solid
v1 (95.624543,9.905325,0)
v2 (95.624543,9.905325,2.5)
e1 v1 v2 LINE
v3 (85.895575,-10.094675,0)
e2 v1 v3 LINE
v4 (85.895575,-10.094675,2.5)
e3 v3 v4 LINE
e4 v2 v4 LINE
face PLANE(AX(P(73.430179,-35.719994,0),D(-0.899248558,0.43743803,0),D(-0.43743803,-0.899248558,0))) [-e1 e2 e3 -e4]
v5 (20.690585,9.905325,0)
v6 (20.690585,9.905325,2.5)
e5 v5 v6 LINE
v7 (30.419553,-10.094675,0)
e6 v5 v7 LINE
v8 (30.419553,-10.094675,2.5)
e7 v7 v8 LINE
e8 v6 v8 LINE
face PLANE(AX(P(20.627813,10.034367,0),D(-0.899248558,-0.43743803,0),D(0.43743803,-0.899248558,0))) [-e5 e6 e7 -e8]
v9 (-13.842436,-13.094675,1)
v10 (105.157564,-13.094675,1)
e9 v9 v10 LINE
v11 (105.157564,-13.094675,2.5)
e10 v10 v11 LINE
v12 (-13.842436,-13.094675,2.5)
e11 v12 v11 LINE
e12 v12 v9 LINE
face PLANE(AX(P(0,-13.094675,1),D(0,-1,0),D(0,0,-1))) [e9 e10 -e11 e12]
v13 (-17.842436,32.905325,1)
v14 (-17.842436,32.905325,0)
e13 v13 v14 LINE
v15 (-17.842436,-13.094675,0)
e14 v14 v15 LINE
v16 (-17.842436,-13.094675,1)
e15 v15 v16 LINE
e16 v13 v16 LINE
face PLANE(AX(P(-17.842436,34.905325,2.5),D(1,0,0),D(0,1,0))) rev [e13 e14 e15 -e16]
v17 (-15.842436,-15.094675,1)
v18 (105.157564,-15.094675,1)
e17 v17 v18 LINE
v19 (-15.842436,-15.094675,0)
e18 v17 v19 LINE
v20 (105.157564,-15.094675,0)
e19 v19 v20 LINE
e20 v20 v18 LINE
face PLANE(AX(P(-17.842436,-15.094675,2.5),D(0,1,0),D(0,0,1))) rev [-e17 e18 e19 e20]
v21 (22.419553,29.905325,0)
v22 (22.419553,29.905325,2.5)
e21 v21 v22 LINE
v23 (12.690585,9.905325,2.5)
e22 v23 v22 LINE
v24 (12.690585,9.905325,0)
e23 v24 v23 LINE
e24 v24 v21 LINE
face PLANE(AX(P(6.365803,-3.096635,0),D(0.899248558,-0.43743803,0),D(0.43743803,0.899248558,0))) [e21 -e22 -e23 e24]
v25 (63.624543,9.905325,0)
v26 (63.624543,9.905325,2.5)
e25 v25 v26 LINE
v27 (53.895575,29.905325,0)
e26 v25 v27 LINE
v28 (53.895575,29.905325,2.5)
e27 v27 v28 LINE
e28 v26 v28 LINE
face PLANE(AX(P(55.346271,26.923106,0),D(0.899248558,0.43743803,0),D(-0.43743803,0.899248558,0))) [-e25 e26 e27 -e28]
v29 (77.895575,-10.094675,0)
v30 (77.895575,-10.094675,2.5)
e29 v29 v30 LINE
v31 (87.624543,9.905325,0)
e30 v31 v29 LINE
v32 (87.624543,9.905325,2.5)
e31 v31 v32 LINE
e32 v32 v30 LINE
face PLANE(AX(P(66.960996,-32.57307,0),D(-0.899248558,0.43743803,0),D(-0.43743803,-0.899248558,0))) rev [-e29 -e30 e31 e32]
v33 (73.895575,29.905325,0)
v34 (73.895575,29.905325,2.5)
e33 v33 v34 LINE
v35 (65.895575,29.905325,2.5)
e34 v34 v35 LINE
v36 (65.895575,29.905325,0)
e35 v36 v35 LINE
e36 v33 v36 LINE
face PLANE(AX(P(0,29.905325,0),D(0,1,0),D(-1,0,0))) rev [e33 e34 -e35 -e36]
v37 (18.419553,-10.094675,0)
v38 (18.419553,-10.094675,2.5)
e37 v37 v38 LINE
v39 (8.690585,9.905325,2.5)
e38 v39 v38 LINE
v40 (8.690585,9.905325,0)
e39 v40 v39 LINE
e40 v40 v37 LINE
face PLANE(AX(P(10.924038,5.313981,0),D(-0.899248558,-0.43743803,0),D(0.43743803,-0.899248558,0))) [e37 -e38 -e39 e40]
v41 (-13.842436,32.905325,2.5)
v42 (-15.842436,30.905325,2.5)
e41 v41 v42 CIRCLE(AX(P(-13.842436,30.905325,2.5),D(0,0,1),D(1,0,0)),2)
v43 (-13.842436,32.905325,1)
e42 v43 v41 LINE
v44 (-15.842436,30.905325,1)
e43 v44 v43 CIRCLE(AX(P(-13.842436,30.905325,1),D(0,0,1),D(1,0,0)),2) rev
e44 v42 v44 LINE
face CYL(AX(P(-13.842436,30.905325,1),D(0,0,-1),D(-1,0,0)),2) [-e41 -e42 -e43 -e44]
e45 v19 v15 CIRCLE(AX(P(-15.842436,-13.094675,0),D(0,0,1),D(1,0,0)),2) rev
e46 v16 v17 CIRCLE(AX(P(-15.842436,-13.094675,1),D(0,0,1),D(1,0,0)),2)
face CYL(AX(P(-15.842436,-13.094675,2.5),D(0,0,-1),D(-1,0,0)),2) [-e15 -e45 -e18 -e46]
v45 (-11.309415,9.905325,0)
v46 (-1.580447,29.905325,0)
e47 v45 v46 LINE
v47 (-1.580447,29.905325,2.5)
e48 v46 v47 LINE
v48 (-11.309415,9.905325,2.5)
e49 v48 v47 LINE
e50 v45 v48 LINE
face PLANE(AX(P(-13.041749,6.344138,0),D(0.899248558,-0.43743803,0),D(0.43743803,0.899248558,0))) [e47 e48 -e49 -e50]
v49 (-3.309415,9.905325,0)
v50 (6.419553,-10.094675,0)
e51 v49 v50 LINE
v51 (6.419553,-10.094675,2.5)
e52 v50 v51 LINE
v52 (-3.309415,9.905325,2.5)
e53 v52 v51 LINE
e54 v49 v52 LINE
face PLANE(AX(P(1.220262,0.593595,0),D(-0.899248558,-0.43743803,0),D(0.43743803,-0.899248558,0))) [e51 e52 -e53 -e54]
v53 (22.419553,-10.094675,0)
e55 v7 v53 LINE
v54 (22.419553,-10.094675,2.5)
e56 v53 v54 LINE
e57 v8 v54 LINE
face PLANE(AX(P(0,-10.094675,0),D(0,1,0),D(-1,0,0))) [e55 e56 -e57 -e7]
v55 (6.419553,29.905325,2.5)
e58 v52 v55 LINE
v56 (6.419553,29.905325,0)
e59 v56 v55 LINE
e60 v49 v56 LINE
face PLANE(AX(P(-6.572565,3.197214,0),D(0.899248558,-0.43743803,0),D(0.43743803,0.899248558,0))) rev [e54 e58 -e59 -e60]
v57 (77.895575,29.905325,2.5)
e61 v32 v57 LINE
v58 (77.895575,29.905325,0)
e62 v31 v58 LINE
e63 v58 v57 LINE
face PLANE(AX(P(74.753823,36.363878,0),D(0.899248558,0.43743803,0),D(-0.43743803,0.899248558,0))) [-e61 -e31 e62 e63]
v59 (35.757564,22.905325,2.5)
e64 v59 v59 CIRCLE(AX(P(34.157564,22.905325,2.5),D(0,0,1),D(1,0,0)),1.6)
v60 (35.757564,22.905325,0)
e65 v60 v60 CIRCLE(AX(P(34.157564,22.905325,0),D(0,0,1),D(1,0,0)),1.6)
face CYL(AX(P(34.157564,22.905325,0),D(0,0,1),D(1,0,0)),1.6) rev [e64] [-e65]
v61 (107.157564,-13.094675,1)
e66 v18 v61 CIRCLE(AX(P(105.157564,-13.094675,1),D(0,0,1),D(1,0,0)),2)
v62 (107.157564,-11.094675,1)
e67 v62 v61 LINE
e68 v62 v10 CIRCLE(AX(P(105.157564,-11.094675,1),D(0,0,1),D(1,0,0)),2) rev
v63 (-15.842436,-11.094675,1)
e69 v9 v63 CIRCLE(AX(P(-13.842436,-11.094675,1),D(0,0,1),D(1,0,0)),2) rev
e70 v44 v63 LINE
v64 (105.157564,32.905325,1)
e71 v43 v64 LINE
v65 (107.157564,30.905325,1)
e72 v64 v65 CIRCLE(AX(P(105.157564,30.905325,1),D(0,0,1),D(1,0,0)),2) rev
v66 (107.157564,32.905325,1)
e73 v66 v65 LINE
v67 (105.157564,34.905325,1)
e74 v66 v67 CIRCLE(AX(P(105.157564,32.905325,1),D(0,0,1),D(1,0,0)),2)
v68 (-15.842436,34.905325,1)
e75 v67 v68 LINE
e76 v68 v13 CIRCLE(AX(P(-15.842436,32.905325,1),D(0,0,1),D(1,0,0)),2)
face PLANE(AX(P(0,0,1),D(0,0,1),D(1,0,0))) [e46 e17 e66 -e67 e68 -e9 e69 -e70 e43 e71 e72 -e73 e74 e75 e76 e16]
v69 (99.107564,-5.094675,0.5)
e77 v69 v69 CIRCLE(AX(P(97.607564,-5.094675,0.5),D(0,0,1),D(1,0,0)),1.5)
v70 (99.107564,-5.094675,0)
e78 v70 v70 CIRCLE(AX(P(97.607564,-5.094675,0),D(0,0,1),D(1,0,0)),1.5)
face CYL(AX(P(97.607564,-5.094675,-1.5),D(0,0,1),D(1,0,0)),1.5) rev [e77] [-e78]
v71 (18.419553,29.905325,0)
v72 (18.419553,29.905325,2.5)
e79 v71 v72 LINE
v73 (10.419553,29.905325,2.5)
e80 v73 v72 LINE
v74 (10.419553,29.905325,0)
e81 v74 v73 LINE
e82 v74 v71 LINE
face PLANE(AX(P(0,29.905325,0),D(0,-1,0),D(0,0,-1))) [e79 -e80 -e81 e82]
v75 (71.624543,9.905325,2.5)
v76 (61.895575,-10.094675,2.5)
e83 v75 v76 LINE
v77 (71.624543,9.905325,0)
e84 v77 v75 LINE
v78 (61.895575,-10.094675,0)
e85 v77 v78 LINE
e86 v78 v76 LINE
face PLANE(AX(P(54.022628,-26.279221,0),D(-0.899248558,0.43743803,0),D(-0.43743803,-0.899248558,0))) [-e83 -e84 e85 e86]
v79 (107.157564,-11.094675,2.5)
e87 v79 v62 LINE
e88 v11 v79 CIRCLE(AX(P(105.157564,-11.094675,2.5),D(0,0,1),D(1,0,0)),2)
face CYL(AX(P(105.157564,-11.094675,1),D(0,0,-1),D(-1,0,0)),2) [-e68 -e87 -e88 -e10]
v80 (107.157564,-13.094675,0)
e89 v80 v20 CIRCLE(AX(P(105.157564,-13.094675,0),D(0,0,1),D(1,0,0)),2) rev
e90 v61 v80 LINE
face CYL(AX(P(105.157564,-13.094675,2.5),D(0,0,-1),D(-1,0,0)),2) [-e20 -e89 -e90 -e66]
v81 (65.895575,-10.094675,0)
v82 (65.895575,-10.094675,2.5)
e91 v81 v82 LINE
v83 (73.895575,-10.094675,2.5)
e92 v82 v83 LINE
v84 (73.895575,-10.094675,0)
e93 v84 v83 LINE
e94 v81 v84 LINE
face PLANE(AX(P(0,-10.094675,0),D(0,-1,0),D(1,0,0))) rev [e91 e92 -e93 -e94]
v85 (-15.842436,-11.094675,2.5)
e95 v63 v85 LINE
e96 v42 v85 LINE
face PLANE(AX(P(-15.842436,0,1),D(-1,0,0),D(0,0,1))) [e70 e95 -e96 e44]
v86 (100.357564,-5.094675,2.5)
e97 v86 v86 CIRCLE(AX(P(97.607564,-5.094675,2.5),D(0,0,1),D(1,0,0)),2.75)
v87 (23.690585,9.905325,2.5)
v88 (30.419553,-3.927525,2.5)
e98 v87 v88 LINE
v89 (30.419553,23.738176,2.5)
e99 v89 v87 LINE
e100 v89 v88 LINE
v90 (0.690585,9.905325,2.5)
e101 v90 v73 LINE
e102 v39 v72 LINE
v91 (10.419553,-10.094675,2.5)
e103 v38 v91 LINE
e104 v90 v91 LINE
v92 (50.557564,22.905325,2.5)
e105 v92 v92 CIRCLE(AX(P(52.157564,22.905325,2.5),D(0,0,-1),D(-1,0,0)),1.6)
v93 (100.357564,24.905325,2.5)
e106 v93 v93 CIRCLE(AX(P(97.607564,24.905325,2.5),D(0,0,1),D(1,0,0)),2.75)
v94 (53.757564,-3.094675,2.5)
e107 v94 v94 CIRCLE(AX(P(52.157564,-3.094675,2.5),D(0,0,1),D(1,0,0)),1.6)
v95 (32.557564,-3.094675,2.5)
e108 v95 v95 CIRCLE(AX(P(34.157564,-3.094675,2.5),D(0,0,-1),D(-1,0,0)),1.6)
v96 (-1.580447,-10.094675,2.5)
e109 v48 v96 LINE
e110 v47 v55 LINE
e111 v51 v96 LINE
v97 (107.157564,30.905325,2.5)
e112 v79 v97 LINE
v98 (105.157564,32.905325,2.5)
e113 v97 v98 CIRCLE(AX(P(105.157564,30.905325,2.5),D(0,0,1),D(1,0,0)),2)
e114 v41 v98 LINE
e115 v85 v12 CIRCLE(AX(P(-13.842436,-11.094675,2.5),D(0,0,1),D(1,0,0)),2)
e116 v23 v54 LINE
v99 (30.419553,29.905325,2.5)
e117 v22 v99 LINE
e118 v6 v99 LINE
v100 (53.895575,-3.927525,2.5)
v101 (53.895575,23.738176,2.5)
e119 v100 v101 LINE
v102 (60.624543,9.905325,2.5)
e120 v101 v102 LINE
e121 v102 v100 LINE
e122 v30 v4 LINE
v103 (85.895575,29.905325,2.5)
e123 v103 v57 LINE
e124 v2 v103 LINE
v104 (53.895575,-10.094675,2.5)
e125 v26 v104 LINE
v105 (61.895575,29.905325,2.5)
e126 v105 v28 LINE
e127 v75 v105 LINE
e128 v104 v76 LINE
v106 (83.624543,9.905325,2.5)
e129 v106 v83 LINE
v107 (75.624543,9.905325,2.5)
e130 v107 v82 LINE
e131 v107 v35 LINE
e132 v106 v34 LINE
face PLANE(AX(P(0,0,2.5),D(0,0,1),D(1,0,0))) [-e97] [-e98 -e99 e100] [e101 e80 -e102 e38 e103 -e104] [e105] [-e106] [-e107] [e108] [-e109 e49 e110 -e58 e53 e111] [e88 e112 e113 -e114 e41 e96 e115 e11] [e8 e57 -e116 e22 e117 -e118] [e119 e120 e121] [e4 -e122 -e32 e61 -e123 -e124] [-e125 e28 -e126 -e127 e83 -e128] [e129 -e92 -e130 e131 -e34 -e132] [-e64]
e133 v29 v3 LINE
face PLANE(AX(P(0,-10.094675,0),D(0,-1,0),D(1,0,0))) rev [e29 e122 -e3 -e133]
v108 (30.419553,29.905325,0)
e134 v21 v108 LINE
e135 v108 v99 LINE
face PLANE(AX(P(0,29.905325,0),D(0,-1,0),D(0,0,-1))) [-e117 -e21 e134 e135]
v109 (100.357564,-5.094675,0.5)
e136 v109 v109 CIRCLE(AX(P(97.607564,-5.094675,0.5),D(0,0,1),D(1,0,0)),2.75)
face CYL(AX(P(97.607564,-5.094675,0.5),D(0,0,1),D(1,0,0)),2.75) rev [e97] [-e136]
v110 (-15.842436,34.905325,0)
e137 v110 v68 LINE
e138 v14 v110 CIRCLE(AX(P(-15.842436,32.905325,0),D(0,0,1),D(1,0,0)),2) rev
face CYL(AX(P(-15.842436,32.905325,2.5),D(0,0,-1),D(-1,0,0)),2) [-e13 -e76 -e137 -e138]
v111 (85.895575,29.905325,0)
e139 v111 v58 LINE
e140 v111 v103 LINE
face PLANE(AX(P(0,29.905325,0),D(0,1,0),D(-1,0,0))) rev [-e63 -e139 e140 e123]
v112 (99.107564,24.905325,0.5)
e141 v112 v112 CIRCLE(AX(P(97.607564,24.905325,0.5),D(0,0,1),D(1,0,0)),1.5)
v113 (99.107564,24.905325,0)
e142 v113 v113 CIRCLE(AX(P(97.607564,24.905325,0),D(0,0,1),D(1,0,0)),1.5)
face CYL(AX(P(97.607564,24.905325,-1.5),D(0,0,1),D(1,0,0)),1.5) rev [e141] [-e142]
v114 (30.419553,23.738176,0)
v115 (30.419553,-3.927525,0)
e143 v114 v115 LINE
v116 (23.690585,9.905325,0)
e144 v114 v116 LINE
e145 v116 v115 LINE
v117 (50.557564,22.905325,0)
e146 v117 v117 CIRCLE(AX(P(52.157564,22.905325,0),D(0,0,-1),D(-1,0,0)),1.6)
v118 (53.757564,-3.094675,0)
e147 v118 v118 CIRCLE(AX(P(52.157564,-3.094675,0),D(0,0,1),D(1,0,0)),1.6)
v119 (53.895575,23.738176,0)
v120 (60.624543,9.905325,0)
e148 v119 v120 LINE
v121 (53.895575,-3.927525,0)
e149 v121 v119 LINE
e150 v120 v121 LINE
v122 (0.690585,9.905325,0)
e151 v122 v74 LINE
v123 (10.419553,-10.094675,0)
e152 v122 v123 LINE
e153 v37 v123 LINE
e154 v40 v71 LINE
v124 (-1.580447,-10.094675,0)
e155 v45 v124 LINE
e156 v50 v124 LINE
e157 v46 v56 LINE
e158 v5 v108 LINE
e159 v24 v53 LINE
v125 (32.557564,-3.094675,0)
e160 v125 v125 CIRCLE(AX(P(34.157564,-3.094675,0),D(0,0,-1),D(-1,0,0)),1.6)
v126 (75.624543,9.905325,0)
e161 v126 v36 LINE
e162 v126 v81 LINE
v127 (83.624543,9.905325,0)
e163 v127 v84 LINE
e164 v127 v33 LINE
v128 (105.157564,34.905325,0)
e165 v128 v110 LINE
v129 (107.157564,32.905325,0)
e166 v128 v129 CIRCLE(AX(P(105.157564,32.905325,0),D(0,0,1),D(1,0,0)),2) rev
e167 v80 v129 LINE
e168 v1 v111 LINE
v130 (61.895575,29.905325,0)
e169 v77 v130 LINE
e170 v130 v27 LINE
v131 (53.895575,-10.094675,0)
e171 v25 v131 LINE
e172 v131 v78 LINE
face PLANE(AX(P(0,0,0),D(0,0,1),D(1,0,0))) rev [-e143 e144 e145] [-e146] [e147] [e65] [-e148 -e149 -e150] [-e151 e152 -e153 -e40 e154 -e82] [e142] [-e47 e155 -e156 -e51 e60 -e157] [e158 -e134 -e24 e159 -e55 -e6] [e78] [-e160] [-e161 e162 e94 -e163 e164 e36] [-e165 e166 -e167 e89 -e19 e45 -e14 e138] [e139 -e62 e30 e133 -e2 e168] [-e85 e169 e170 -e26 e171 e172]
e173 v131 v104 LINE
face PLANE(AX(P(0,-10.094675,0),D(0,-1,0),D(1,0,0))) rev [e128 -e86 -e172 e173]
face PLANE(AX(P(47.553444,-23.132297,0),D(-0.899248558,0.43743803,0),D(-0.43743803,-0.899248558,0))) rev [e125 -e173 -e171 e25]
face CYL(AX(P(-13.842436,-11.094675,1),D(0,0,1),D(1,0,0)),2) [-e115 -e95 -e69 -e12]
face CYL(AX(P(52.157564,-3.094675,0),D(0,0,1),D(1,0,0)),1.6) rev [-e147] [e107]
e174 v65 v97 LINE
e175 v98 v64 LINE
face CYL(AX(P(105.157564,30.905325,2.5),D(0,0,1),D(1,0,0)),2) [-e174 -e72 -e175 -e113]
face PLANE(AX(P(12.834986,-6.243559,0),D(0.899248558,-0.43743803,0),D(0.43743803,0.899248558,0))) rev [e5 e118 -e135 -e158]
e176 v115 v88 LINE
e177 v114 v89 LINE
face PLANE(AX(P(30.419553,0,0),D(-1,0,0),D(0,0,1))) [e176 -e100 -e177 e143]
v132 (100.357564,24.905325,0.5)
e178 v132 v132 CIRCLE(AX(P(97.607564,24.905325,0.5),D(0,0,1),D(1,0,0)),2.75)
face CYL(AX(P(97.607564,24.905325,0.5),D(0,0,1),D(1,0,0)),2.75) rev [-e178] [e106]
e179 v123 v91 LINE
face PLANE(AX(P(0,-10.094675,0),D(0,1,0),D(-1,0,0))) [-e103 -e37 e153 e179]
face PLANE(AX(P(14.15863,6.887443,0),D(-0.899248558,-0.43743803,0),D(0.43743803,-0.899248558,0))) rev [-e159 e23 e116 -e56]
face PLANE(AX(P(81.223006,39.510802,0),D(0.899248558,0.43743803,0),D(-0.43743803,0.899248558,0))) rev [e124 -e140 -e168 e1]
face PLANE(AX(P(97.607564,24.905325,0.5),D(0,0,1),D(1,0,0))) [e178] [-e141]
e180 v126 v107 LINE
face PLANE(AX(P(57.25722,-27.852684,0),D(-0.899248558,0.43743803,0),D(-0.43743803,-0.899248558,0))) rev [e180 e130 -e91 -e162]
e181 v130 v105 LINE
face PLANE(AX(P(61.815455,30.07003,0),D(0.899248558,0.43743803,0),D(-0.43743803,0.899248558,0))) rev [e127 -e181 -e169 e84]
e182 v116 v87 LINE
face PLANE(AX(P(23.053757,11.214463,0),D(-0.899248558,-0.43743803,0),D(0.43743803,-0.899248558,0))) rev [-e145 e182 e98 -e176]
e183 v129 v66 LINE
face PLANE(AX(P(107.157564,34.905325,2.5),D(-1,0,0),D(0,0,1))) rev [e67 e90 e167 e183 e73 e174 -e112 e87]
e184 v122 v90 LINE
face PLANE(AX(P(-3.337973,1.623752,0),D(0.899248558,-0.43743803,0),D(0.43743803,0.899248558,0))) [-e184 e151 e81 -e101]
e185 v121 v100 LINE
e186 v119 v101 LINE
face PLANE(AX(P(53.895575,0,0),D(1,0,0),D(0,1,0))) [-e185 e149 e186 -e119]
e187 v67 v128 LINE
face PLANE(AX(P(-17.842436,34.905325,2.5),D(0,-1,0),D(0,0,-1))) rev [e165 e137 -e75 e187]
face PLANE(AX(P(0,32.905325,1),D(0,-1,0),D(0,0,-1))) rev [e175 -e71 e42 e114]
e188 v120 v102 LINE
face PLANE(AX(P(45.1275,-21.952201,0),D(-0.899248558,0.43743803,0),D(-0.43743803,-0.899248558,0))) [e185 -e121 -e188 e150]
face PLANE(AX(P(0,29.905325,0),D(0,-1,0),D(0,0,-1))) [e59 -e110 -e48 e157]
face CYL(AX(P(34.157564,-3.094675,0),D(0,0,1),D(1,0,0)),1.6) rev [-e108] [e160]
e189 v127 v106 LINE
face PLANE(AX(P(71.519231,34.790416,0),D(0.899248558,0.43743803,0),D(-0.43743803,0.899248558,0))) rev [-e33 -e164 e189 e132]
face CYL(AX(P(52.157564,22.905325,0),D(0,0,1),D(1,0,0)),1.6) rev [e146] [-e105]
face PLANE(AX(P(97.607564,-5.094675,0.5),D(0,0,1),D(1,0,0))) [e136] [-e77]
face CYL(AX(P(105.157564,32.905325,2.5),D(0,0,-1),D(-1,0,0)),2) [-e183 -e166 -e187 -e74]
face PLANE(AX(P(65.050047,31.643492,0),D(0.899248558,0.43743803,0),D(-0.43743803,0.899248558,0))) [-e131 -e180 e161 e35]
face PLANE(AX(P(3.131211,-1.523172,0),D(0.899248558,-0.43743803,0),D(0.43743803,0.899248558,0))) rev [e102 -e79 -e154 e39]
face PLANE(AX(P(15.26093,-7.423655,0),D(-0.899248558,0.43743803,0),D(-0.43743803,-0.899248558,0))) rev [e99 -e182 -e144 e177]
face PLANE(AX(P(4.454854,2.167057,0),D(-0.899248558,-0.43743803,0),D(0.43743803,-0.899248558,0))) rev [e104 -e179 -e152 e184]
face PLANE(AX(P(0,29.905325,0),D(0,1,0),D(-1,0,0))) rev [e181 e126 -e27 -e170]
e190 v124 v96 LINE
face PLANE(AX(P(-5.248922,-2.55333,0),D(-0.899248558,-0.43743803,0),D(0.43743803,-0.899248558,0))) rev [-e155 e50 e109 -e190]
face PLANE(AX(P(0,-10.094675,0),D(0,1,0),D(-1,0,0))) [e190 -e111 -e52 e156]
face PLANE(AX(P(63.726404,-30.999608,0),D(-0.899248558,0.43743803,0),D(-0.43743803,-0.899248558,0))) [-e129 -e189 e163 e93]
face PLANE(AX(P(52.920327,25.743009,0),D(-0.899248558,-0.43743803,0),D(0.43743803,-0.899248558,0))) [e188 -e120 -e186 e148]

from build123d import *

# Parameters (mm, degrees)
ESBO_O1_W                  = 125
ESBO_O1_H                  = 50
RESSALTO_EXTRUS_O1_DEPTH   = 2.5
ESBO_O2_R                  = 1.6
CORTE_EXTRUS_O2_DEPTH      = 2.5
CORTE_EXTRUS_O3_DEPTH      = 1.5
CORTE_EXTRUS_O5_DEPTH      = 113.726994752
CORTE_EXTRUS_O5_DEPTH_BACK = 113.726994752
ESBO_O12_R                 = 2.75
CORTE_EXTRUS_O6_DEPTH      = 2
ESBO_O19_R                 = 1.5
CORTE_EXTRUS_O7_DEPTH      = 2
FILETE1_R                  = 2


with BuildPart() as part:
    # Esboço1 → Ressalto-extrusão1 (new body)
    with BuildSketch(Plane.XY):
        with Locations((44.657564369, 9.905325444)):
            Rectangle(ESBO_O1_W, ESBO_O1_H)
    extrude(amount=RESSALTO_EXTRUS_O1_DEPTH)

    # Esboço2 → Corte-extrusão2 (cut)
    with BuildSketch(Plane.XY.offset(2.5)):
        with Locations((34.157564369, 22.905325444)):
            Circle(ESBO_O2_R)
        with Locations(Location((34.157564369, -3.094674556, 0), (0, 0, 180))):
            Circle(ESBO_O2_R)
        with Locations((52.157564369, -3.094674556)):
            Circle(ESBO_O2_R)
        with Locations(Location((52.157564369, 22.905325444, 0), (0, 0, 180))):
            Circle(ESBO_O2_R)
    extrude(amount=-CORTE_EXTRUS_O2_DEPTH, mode=Mode.SUBTRACT)

    # Esboço3 → Corte-extrusão3 (cut)
    with BuildSketch(Plane.XY.offset(2.5)):
        Polygon((-17.842435631, 32.905325444), (-17.842435631, 9.905325444), (-15.842435631, 9.905325444), (-15.842435631, 32.905325444), (107.157564369, 32.905325444), (107.157564369, 34.905325444), (-15.842435631, 34.905325444), (-17.842435631, 34.905325444), align=None)
        Polygon((-15.842435631, 9.905325444), (-17.842435631, 9.905325444), (-17.842435631, -13.094674556), (-17.842435631, -15.094674556), (-15.842435631, -15.094674556), (107.157564369, -15.094674556), (107.157564369, -13.094674556), (-15.842435631, -13.094674556), align=None)
    extrude(amount=-CORTE_EXTRUS_O3_DEPTH, mode=Mode.SUBTRACT)

    # Esboço4 → Corte-extrusão5 (cut, two sides: drawn at the far end of the back side and taken through both)
    with BuildSketch(Plane.XY.offset(2.5).offset(-CORTE_EXTRUS_O5_DEPTH_BACK)):
        Polygon((0.690585312, 9.905325444), (10.419553485, -10.094674556), (18.419553485, -10.094674556), (8.690585312, 9.905325444), (18.419553485, 29.905325444), (10.419553485, 29.905325444), align=None)
        Polygon((20.690585312, 9.905325444), (30.419553485, 29.905325444), (22.419553485, 29.905325444), (12.690585312, 9.905325444), (22.419553485, -10.094674556), (30.419553485, -10.094674556), align=None)
        Polygon((30.419553485, 23.738176067), (23.690585312, 9.905325444), (30.419553485, -3.927525179), align=None)
        Polygon((-11.309414688, 9.905325444), (-1.580446515, -10.094674556), (6.419553485, -10.094674556), (-3.309414688, 9.905325444), (6.419553485, 29.905325444), (-1.580446515, 29.905325444), align=None)
        Polygon((95.624543426, 9.905325444), (85.895575254, 29.905325444), (77.895575254, 29.905325444), (87.624543426, 9.905325444), (77.895575254, -10.094674556), (85.895575254, -10.094674556), align=None)
        Polygon((83.624543426, 9.905325444), (73.895575254, 29.905325444), (65.895575254, 29.905325444), (75.624543426, 9.905325444), (65.895575254, -10.094674556), (73.895575254, -10.094674556), align=None)
        Polygon((71.624543426, 9.905325444), (61.895575254, 29.905325444), (53.895575254, 29.905325444), (63.624543426, 9.905325444), (53.895575254, -10.094674556), (61.895575254, -10.094674556), align=None)
        Polygon((60.624543426, 9.905325444), (53.895575254, -3.927525179), (53.895575254, 23.738176067), align=None)
    extrude(amount=CORTE_EXTRUS_O5_DEPTH + CORTE_EXTRUS_O5_DEPTH_BACK, mode=Mode.SUBTRACT)

    # Esboço12 → Corte-extrusão6 (cut)
    with BuildSketch(Plane.XY.offset(2.5)):
        with Locations((97.607564369, 24.905325444)):
            Circle(ESBO_O12_R)
        with Locations((97.607564369, -5.094674556)):
            Circle(ESBO_O12_R)
    extrude(amount=-CORTE_EXTRUS_O6_DEPTH, mode=Mode.SUBTRACT)

    # Esboço19 → Corte-extrusão7 (cut)
    with BuildSketch(Plane.XY.offset(0.5)):
        with Locations((97.607564369, 24.905325444)):
            Circle(ESBO_O19_R)
        with Locations((97.607564369, -5.094674556)):
            Circle(ESBO_O19_R)
    extrude(amount=-CORTE_EXTRUS_O7_DEPTH, mode=Mode.SUBTRACT)

    # Filete1
    filete1_edges = [part.edges().sort_by_distance(p)[0] for p in [
        (-17.842435631, -15.094674556, 0.5),
        (-15.842435631, -13.094674556, 1.75),
        (-17.842435631, 34.905325444, 0.5),
        (-15.842435631, 32.905325444, 1.75),
        (107.157564369, -15.094674556, 0.5),
        (107.157564369, -13.094674556, 1.75),
        (107.157564369, 32.905325444, 1.75),
        (107.157564369, 34.905325444, 0.5),
    ]]
    fillet(filete1_edges, radius=FILETE1_R - 0.0001)  # a hair under: the kernel refuses the full size


solid = part.part
